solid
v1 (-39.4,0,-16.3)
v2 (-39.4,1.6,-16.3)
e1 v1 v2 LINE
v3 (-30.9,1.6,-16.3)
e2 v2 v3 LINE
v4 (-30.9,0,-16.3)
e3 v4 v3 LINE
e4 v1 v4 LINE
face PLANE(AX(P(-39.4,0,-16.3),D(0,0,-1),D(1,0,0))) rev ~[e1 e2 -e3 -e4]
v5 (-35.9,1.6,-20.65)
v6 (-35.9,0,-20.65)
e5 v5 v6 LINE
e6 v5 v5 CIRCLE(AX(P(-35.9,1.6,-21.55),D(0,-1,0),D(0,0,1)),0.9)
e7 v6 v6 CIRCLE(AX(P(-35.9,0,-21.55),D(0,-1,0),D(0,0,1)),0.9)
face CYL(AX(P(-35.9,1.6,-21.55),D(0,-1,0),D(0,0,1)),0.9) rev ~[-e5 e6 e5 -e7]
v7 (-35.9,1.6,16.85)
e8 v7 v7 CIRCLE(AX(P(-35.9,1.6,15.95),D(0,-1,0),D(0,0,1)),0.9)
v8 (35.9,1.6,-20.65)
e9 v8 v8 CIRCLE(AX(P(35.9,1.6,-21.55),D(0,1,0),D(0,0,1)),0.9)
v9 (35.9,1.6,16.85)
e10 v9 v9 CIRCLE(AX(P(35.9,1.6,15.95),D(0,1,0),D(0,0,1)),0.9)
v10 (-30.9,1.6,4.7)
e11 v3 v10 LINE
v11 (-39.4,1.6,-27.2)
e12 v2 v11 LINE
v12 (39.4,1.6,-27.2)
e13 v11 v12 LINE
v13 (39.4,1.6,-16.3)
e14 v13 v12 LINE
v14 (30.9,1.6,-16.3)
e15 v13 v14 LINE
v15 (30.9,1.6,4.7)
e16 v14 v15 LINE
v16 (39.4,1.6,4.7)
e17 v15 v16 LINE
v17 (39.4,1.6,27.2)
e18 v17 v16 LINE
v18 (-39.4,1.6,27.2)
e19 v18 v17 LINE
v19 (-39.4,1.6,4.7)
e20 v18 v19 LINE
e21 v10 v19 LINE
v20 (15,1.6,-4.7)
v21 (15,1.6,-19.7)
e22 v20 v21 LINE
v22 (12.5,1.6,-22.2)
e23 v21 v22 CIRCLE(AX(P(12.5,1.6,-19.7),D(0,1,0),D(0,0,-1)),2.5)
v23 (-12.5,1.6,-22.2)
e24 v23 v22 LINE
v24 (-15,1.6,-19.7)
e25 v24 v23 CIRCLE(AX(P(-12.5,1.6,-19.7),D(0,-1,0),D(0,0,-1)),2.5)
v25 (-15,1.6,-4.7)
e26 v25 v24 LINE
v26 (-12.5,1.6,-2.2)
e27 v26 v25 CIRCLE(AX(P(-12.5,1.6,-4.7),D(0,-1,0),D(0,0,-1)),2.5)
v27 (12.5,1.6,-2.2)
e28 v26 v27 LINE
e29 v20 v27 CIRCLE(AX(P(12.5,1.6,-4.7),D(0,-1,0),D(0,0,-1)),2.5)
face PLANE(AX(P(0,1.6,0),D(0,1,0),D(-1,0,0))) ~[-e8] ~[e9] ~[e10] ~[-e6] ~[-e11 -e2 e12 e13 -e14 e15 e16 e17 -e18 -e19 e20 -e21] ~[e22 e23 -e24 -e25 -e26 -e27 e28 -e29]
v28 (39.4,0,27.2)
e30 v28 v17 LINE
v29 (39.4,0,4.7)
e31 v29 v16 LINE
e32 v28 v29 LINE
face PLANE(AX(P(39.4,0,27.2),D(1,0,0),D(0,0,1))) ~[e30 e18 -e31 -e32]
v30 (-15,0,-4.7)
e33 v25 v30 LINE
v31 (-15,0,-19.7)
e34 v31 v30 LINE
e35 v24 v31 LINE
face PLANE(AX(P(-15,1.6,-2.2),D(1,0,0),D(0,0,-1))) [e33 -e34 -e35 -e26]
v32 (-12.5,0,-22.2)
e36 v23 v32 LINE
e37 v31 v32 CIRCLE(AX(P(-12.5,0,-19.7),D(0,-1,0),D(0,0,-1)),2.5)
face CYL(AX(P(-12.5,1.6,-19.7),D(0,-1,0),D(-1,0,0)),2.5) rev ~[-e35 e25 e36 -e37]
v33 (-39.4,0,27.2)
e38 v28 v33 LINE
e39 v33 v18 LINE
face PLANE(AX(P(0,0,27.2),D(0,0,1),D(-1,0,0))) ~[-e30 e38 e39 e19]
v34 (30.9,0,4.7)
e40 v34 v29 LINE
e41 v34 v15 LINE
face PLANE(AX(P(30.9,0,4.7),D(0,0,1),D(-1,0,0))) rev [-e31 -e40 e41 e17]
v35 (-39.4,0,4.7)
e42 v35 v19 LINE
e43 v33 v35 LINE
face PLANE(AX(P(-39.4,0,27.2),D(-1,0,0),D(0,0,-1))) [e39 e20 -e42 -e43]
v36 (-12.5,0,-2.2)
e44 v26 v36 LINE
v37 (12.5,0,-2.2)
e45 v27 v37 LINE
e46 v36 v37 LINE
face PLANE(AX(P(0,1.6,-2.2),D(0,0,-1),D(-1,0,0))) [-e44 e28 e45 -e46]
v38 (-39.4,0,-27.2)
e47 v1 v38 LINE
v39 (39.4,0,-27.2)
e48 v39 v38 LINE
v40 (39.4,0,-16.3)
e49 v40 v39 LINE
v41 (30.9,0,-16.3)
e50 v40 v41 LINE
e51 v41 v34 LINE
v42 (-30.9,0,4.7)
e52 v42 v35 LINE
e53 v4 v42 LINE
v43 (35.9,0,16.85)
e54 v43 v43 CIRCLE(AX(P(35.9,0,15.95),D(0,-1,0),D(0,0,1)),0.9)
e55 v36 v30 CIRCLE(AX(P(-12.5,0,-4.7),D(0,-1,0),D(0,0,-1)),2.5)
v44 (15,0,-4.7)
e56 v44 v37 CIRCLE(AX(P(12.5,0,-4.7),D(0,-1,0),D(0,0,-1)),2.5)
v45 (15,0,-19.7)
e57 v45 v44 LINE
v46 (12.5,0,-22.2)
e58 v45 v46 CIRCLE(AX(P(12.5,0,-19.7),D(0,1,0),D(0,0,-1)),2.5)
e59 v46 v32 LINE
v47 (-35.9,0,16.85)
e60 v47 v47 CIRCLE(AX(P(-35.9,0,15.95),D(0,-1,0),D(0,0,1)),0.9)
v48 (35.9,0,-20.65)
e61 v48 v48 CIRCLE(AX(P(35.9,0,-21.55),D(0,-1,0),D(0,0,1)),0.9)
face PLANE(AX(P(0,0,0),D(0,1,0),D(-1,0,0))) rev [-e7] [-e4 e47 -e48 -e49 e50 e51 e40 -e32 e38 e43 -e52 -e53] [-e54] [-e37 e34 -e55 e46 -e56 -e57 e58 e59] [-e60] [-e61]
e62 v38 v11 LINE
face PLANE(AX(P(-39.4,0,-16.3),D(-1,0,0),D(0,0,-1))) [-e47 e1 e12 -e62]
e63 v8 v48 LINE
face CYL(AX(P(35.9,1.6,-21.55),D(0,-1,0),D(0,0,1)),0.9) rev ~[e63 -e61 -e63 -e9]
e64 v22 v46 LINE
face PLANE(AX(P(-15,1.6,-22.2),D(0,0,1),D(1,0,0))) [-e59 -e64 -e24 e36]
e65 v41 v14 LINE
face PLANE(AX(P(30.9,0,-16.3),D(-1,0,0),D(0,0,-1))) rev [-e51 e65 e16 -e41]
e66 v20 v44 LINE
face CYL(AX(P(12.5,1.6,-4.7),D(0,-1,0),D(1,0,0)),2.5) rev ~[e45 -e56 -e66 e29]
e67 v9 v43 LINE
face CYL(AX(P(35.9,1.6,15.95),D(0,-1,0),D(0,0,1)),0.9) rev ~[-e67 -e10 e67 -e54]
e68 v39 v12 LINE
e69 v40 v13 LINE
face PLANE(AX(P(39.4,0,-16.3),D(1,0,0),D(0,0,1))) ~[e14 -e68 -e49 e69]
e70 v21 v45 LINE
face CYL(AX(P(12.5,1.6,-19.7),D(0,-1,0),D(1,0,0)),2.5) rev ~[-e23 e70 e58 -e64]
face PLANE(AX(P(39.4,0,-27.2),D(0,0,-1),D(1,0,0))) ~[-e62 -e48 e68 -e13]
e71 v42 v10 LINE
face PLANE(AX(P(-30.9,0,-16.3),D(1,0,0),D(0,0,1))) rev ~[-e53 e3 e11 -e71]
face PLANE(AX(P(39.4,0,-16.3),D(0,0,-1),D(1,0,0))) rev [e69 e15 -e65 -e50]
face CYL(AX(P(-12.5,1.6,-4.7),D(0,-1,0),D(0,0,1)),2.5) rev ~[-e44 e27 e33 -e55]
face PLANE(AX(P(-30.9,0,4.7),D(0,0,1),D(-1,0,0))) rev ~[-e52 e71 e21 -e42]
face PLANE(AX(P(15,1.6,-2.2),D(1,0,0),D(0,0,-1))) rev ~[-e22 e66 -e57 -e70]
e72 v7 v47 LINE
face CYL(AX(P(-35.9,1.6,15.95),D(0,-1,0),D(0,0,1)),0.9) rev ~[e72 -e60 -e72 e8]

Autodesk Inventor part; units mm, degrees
ref_plane "YZ Plane" through (0, 0, 0) normal (1, 0, 0) x (0, 1, 0)
ref_plane "XZ Plane" through (0, 0, 0) normal (0, 1, 0) x (-1, 0, 0)
ref_plane "XY Plane" through (0, 0, 0) normal (0, 0, 1) x (1, 0, 0)
sketch "スケッチ1" plane through (0, 0, 0) normal (0, 1, 0) x (-1, 0, 0)
  line L0 (39.4, -27.2) -> (0, -27.2)
  line L1 (0, -27.2) -> (0, 27.2)
  line L2 (0, 27.2) -> (39.4, 27.2)
  line L3 (39.4, -16.3) -> (30.9, -16.3)
  line L4 (30.9, -16.3) -> (30.9, 4.7)
  line L5 (30.9, 4.7) -> (39.4, 4.7)
  line L6 (39.4, 4.7) -> (39.4, -16.3) construction
  line L7 (39.4, 27.2) -> (39.4, 4.7)
  line L8 (39.4, -16.3) -> (39.4, -27.2)
  point P0 (0, 0)
  point P1 (0, 0)
  dimension "d0" = 10.9
  dimension "d1" = 22.5
  dimension "d2" = 39.4
  dimension "d3" = 21
  dimension "d5" = 8.5
extrude "押し出し1" add sketch "スケッチ1" along normal blind 1.6
sketch "スケッチ2" plane through (0, 1.6, 0) normal (0, 1, 0) x (1, 0, 0)
  line L0 (-30.9, 16.3) -> (-30.9, -4.7) projected
  line L1 (-30.9, -4.7) -> (-39.4, -4.7) projected
  line L2 (-39.4, -4.7) -> (-39.4, -27.2) projected
  line L3 (-39.4, -27.2) -> (0, -27.2) projected
  line L4 (0, -27.2) -> (0, 27.2) projected
  line L5 (0, 27.2) -> (-39.4, 27.2) projected
  line L6 (-39.4, 27.2) -> (-39.4, 16.3) projected
  line L7 (-39.4, 16.3) -> (-30.9, 16.3) projected
  point P0 (0, 0)
  point P1 (-35.9, 21.55)
  point P2 (-35.9, -15.95)
  dimension "d8" = 11.25
  dimension "d9" = 5.25
  dimension "d10" = 3.5
  dimension "d11" = 3.5
hole "穴1" at (-35.9, 1.6, -21.55) at (-35.9, 1.6, 15.95) direction (0, -1, 0) diameter 1.8 end through all
mirror "ミラー1" about plane through (0, 0, 27.2) normal (1, 0, 0) of "押し出し1"
ref_plane "作業平面1" through (0, 0, 4.7) normal (-1, 0, 0) x (0, 0, 1)
mirror "ミラー2" about plane through (0, 0, 4.7) normal (-1, 0, 0) of "穴1", "押し出し1"
sketch "スケッチ3" plane through (0, 1.6, 0) normal (0, 1, 0) x (1, 0, 0)
  circle A0 centre (35.9, 21.55) radius 0.9 projected
  circle A1 centre (35.9, -15.95) radius 0.9 projected
  line L0 (-39.4, 27.2) -> (39.4, 27.2) projected
  line L1 (-39.4, 27.2) -> (-39.4, 16.3) projected
  line L2 (-39.4, 16.3) -> (-30.9, 16.3) projected
  line L3 (-30.9, 16.3) -> (-30.9, -4.7) projected
  line L4 (-30.9, -4.7) -> (-39.4, -4.7) projected
  line L5 (-39.4, -4.7) -> (-39.4, -27.2) projected
  line L6 (-39.4, -27.2) -> (39.4, -27.2) projected
  line L7 (39.4, -4.7) -> (39.4, -27.2) projected
  line L8 (30.9, -4.7) -> (39.4, -4.7) projected
  line L9 (30.9, 16.3) -> (30.9, -4.7) projected
  line L10 (39.4, 16.3) -> (30.9, 16.3) projected
  line L11 (39.4, 27.2) -> (39.4, 16.3) projected
  circle A2 centre (-35.9, 21.55) radius 0.9 projected
  circle A3 centre (-35.9, -15.95) radius 0.9 projected
  line L12 (-15, 22.2) -> (0, 22.2)
  line L13 (0, 22.2) -> (0, 2.2)
  line L14 (0, 2.2) -> (-15, 2.2)
  line L15 (-15, 2.2) -> (-15, 22.2)
  line L16 (15, 22.2) -> (0, 22.2)
  line L17 (0, 2.2) -> (15, 2.2)
  line L18 (15, 2.2) -> (15, 22.2)
  line L19 (-39.4, 16.3) -> (-30.9, 16.3) projected
  line L20 (-30.9, 16.3) -> (-30.9, -4.7)
  line L21 (30.9, 16.3) -> (30.9, -4.7) projected
  line L22 (30.9, -4.7) -> (30.9, 16.3)
  line L23 (-30.9, 16.3) -> (-30.9, -4.7) projected
  point P0 (0, 0)
  point P1 (0, 12.2)
  dimension "d19" = 30
  dimension "d21" = 20
  dimension "d26" = 5
  dimension "d28" = 39.4
extrude "押し出し2" cut sketch "スケッチ3" against normal blind 10 contours L12 L13 L14 L15 | L16 L18 L17 L13
fillet "フィレット1" radius 2.5 4 edges at (-15, 0.8, -22.2) (-15, 0.8, -2.2) (15, 0.8, -2.2) (15, 0.8, -22.2)
equation "\"d17\" = Thickness"
equation "\"BendRadius\" = Thickness"
equation "\"BendReliefWidth\" = Thickness"
equation "\"BendReliefDepth\" = 0.5 * Thickness"
equation "\"CornerReliefSize\" = 4 * Thickness"
equation "\"MinimumRemnant\" = 2 * Thickness"
equation "\"TransitionRadius\" = BendRadius"
equation "\"JacobiRadiusSize\" = BendRadius"
equation "\"GapSize\" = Thickness"
equation "\"Thickness\" = 0.5"
properties part number "old"
